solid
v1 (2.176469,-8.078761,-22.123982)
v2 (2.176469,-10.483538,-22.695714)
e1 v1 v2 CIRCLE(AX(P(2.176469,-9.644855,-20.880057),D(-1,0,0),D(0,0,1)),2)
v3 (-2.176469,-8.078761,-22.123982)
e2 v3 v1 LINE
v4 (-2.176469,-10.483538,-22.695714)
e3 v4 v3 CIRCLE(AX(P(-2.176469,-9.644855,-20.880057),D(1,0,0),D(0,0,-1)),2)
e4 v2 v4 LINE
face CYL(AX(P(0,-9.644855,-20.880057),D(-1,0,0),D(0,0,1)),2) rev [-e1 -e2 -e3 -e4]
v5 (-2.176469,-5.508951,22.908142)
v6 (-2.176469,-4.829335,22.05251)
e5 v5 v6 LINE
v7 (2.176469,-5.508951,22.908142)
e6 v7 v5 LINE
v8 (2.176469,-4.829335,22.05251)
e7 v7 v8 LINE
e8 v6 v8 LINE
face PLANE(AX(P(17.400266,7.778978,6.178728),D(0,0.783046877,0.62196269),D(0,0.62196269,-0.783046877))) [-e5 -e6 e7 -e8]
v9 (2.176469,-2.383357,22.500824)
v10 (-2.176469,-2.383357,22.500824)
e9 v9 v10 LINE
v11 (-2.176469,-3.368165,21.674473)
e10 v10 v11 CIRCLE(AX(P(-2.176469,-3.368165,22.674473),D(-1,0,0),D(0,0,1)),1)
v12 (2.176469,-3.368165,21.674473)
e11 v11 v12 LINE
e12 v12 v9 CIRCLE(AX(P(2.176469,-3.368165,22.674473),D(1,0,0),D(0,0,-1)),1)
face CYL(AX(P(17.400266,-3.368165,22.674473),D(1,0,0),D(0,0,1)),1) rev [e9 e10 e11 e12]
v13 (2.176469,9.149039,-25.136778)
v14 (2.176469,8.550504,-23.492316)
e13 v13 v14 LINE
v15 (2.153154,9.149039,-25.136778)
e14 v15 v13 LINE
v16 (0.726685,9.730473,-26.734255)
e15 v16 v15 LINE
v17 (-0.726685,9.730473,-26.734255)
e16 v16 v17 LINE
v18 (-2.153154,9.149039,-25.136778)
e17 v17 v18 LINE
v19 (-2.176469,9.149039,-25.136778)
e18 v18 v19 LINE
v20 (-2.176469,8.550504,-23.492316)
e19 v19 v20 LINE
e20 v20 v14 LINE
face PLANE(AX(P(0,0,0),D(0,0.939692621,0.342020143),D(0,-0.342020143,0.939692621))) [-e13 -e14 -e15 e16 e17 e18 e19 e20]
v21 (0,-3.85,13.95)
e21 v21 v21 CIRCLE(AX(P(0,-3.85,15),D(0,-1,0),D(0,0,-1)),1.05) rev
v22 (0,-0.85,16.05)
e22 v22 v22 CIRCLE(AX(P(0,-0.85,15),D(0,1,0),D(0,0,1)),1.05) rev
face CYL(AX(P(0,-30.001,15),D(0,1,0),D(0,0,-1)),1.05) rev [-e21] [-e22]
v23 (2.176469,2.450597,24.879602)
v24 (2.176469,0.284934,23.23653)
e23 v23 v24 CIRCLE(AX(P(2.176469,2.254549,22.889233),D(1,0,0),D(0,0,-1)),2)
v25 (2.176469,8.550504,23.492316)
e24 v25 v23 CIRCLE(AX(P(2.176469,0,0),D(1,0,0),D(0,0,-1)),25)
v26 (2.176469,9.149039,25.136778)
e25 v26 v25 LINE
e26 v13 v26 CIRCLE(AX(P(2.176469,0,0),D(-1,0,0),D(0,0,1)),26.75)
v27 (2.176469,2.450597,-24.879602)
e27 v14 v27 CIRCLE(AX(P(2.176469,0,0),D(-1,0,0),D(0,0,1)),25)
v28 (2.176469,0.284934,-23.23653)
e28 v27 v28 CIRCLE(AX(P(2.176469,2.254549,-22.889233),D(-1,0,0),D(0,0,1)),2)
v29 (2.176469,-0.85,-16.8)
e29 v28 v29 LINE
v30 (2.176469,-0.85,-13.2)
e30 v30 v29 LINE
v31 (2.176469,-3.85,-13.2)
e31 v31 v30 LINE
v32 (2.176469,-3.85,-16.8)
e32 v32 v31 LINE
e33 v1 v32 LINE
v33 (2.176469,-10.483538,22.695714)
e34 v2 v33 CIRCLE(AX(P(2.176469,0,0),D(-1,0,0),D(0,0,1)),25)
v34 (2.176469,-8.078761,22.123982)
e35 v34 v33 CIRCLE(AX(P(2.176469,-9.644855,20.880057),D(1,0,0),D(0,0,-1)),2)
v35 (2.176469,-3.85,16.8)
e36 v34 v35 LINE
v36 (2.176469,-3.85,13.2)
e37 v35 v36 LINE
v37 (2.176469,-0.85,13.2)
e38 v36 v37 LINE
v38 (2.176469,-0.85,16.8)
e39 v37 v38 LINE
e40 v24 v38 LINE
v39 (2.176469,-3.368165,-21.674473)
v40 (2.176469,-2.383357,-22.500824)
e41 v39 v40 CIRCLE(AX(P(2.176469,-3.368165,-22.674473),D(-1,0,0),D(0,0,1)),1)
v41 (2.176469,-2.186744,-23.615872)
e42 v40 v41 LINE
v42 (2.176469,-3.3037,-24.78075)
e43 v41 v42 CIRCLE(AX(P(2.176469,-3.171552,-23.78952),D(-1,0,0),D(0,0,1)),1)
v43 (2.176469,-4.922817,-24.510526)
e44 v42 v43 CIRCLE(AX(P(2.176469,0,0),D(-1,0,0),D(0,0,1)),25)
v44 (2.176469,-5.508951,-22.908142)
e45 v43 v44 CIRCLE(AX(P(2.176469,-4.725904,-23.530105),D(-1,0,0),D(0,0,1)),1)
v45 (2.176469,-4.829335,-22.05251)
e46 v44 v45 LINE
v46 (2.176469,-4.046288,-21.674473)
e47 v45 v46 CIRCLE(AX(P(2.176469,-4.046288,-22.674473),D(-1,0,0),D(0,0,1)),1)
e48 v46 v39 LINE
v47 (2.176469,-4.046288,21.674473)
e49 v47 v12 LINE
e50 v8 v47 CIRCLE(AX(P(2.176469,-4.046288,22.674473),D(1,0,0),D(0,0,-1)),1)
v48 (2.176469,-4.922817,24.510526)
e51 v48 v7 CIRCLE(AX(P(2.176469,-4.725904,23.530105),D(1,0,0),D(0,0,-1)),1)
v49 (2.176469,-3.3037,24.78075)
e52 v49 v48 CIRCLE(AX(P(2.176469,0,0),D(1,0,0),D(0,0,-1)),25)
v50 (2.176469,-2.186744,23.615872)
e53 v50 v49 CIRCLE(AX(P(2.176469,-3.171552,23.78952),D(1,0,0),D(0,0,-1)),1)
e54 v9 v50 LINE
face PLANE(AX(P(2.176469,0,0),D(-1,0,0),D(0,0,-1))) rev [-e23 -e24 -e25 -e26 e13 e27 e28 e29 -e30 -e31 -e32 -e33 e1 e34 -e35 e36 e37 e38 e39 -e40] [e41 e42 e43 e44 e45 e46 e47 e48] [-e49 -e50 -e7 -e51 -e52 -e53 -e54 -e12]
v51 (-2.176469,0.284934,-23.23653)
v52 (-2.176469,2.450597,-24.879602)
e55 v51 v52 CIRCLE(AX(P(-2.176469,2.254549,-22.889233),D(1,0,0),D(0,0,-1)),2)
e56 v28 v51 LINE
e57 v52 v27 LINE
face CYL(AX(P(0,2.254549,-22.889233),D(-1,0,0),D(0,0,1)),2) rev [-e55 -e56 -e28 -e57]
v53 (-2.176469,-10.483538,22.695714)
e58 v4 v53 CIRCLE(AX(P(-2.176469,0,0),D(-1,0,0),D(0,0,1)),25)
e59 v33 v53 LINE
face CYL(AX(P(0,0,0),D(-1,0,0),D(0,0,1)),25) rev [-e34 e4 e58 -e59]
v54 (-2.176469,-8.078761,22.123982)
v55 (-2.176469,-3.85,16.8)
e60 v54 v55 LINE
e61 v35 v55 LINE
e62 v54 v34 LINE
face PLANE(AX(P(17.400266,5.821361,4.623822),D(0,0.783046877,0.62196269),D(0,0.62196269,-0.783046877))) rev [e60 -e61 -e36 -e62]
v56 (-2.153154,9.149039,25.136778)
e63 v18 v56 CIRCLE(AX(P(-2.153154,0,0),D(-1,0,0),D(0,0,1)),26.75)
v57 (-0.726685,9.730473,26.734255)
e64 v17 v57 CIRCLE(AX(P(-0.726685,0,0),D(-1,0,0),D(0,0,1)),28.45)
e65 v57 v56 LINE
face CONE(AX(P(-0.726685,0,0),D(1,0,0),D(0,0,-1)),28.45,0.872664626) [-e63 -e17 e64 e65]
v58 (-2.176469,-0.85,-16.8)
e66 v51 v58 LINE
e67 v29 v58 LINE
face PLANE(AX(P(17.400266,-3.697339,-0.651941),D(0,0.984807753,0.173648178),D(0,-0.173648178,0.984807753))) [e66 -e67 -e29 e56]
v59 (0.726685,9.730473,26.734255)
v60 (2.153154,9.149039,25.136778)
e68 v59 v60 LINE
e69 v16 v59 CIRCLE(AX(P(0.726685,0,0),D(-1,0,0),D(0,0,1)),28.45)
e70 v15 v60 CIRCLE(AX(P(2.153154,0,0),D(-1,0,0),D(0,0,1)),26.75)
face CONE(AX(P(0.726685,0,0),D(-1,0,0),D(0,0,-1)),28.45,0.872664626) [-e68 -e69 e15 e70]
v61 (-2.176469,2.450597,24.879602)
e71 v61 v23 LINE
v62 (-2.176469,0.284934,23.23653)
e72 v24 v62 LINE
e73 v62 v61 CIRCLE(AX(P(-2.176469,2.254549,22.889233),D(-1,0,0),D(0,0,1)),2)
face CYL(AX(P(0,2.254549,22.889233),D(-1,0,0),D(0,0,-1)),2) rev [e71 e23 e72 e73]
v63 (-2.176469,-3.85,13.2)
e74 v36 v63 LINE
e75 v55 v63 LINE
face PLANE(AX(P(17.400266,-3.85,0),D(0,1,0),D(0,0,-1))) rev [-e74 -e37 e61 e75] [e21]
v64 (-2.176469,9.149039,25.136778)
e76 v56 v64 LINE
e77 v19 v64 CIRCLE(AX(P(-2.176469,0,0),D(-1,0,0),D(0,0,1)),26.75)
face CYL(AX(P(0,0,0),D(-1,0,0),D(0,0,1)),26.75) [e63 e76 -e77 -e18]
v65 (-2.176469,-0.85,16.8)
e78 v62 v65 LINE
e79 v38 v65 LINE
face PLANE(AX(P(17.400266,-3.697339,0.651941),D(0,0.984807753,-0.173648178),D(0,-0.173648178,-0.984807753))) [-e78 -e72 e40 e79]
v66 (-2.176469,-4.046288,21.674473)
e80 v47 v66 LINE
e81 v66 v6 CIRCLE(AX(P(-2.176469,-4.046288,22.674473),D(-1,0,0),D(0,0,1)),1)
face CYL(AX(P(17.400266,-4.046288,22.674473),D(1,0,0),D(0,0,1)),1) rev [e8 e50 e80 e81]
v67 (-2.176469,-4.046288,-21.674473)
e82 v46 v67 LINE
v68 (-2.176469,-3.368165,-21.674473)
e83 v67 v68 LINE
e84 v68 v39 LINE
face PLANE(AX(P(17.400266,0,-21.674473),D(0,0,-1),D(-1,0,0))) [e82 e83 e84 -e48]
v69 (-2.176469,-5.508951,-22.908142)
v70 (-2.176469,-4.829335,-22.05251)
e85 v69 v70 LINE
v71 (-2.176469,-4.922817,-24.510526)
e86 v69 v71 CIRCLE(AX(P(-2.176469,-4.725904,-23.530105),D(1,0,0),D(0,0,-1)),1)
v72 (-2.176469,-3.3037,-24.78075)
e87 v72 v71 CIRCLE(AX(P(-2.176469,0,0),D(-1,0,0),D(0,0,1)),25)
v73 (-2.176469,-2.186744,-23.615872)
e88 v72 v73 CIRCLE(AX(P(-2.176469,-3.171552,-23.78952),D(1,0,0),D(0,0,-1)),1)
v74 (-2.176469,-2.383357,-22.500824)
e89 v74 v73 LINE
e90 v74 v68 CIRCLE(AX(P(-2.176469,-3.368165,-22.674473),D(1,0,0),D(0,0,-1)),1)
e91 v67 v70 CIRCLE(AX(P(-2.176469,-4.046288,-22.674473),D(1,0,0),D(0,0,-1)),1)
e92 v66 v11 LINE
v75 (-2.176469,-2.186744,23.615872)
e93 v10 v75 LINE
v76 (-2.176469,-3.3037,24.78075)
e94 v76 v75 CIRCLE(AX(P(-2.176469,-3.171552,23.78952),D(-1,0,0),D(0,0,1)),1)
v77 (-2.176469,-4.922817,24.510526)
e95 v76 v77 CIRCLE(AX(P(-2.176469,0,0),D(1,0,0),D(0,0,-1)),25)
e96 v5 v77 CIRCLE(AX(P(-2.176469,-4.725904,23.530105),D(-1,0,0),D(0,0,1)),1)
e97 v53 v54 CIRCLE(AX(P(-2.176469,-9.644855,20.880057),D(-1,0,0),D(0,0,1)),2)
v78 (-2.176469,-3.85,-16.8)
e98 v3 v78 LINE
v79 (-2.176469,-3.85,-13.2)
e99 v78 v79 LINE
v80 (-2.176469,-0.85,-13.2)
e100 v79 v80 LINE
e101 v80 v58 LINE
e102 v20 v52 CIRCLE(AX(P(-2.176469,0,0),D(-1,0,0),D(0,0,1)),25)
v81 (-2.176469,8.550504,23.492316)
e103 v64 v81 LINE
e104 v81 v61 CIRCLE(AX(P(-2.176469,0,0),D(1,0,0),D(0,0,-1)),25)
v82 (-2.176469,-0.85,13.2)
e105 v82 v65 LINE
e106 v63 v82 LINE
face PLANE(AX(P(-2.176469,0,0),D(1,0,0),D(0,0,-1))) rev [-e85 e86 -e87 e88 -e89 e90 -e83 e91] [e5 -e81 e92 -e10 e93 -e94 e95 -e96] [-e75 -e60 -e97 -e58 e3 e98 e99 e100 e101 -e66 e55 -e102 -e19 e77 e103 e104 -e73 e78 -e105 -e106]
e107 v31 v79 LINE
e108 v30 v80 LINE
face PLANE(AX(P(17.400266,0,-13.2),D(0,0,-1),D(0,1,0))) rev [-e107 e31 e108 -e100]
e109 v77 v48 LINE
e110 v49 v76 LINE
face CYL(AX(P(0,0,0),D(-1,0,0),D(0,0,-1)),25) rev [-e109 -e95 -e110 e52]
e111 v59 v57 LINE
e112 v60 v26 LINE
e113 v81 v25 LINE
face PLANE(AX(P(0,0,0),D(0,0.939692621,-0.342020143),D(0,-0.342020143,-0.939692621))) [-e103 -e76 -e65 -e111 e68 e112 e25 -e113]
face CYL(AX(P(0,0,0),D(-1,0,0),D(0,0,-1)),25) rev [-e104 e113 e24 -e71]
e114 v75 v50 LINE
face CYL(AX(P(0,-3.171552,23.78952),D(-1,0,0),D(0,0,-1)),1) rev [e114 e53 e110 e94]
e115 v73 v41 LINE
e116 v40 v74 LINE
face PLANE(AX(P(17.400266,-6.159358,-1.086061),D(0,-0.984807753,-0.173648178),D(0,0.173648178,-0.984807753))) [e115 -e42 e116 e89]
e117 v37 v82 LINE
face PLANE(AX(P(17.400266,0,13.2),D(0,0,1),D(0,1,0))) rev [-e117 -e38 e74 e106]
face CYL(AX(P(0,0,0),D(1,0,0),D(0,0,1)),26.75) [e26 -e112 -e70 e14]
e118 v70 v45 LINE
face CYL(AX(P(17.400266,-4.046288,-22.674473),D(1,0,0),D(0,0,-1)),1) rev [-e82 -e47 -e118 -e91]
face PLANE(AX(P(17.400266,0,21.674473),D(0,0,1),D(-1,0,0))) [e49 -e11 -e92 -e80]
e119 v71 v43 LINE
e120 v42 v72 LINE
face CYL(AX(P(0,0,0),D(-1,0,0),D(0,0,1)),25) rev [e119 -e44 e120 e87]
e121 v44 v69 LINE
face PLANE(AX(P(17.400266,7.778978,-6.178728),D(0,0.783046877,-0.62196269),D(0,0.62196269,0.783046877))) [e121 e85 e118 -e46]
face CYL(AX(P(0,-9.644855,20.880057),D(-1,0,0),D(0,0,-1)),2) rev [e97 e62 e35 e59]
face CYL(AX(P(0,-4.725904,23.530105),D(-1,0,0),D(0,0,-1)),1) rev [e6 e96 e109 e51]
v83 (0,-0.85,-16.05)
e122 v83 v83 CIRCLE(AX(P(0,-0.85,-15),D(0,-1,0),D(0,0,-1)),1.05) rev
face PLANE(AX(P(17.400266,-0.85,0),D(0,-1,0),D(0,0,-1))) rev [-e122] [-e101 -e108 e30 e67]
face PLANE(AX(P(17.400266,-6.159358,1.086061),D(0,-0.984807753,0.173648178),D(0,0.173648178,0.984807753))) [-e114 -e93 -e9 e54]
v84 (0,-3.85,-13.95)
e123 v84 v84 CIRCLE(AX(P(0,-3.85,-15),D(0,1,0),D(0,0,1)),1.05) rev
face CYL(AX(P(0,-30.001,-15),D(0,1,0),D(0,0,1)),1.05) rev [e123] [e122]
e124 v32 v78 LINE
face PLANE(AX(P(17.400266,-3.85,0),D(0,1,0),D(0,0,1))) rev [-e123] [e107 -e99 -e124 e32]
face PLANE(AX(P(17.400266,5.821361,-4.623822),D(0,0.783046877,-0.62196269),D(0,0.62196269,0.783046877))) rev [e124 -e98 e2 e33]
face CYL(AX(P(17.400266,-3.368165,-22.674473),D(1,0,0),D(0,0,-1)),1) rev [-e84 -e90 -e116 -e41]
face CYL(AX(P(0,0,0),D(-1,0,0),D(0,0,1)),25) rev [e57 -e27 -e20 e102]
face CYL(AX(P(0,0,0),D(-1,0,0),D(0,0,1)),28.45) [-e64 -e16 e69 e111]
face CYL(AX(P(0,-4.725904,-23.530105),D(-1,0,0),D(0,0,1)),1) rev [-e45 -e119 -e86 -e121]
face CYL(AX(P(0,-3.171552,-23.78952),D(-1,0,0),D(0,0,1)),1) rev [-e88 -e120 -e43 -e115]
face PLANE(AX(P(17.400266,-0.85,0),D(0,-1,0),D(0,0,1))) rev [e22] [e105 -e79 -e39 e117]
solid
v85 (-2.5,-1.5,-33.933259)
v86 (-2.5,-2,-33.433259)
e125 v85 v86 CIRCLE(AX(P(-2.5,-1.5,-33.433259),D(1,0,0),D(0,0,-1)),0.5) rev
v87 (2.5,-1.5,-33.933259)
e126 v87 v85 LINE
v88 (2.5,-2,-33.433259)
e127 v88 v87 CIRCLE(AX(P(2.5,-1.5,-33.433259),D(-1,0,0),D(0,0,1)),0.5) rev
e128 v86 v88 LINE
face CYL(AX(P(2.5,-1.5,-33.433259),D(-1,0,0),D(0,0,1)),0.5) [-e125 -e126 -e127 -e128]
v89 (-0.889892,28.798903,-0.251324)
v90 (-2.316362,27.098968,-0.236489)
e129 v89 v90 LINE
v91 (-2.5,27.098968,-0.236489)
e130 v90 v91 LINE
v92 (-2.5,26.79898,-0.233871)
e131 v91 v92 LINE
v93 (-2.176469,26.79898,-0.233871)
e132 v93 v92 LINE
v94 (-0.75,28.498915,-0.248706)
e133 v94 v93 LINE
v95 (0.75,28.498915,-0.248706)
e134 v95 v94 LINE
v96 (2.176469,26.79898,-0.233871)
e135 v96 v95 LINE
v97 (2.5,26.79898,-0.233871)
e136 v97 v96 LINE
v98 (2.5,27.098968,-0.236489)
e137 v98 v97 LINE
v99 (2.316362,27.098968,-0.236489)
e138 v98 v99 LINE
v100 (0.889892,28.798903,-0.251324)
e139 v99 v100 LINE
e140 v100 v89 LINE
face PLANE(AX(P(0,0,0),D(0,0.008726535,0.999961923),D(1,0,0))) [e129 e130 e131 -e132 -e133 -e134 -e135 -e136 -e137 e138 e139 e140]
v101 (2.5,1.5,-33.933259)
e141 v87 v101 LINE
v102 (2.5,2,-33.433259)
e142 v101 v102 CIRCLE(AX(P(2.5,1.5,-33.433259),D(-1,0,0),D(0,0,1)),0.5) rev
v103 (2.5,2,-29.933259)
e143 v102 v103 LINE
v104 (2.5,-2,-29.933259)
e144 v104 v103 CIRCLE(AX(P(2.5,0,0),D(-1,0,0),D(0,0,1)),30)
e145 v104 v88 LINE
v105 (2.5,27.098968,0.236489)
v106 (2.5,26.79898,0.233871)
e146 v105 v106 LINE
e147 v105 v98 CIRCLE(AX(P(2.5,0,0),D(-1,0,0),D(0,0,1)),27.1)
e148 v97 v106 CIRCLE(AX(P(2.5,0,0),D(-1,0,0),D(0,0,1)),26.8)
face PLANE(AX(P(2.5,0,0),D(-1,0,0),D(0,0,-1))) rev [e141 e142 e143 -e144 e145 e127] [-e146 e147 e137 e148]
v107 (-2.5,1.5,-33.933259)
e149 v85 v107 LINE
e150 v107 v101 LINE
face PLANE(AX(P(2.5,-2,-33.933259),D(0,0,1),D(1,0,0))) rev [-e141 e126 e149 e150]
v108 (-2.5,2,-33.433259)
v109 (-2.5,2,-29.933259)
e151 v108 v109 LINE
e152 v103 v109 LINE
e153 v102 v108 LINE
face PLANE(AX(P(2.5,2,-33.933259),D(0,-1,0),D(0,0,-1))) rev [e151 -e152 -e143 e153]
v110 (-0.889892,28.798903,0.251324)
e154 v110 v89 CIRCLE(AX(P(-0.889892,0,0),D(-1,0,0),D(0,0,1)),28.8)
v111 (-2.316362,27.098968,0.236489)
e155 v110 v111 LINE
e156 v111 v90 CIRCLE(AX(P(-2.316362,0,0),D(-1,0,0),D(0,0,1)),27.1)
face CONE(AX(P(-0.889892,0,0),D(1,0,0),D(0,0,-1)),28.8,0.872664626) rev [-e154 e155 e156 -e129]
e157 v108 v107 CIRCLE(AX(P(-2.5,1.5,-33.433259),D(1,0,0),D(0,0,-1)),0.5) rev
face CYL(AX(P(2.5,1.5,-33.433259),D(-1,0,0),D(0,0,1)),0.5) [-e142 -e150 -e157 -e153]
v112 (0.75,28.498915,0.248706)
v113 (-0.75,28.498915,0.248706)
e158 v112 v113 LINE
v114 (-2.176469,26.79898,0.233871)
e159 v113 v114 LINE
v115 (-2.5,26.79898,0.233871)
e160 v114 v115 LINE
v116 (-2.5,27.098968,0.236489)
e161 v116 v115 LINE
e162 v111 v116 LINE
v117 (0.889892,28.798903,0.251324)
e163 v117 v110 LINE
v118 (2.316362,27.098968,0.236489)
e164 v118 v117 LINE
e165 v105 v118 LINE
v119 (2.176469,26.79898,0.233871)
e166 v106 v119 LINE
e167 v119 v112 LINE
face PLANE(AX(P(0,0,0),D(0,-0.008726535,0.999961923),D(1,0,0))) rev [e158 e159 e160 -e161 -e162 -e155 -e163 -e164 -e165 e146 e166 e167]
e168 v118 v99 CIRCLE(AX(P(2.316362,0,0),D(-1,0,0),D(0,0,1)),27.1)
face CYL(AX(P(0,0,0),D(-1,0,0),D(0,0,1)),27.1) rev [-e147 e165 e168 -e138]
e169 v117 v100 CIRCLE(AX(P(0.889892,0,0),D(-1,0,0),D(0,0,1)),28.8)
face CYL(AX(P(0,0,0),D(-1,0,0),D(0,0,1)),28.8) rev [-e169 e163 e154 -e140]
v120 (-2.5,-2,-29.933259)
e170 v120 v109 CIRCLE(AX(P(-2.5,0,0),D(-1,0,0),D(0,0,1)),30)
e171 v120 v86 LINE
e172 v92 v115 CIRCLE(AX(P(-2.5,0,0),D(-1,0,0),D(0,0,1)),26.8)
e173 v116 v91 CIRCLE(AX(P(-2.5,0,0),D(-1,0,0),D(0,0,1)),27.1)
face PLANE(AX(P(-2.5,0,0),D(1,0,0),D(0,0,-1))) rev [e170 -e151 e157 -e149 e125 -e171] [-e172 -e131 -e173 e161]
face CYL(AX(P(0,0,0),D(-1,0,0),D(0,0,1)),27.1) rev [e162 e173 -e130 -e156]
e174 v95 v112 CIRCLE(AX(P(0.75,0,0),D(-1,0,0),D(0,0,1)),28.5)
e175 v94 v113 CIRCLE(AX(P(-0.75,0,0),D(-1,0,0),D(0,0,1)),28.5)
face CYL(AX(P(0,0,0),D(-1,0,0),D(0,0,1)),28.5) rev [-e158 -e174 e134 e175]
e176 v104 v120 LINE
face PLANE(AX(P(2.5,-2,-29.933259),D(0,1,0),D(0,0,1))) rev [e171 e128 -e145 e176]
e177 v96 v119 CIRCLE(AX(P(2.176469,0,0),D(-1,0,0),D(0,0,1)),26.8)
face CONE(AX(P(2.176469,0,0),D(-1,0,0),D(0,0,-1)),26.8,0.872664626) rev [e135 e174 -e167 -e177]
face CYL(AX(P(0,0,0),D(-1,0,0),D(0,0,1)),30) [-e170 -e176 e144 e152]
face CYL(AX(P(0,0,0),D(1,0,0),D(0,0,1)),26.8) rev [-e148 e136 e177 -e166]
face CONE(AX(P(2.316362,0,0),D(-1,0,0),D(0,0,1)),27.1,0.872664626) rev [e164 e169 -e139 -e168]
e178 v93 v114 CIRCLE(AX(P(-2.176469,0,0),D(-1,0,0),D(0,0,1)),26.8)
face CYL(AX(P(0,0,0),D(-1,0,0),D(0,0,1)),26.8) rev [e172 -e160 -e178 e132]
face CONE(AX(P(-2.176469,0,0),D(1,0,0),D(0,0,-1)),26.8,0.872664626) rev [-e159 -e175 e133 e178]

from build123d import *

# Parameters (mm, degrees)
REVOLVE2_ANGLE      = 110
BOSS_EXTRUDE1_START = -2.176469
BOSS_EXTRUDE1_DEPTH = 4.352938
FILLET1_R           = 2
FILLET2_R           = 1
CUT_EXTRUDE1_REACH  = 44.5
SKETCH4_R           = 1.05
SKETCH5_W           = 4
SKETCH5_H           = 4
BOSS_EXTRUDE2_DEPTH = 2.5
FILLET3_R           = 0.5
CUT_REVOLVE2_ANGLE  = 1


# Read off the part's stored shape, not the designer's step: Revolve2
with BuildPart() as part:
    # Sketch2 → Revolve1 (revolve)
    with BuildSketch(Plane(origin=(0, 0, 0), x_dir=(1, 0, 0), z_dir=(0, 1, 0)), mode=Mode.PRIVATE) as revolve1_sk:
        Polygon((-0.75, 28.5), (0, 28.5), (0, 30), (-2.5, 30), (-2.5, 26.8), (-2.176469373, 26.8), align=None)
    revolve1 = revolve(revolve1_sk.sketch.rotate(Axis((0, 0, 0), (1, 0, 0)), 180), axis=Axis((0, 0, 0), (1, 0, 0)))


with BuildPart() as body_2:
    # Revolve2 outline → Revolve2 (revolve)
    with BuildSketch(Plane(origin=(0, 0, 0), x_dir=(0, -1, 0), z_dir=(0, 0, 1))):
        Polygon((25, 0), (25, -2.176469373), (26.75, -2.176469373), (26.75, -2.15315399), (28.45, -0.726684617), (28.45, 0), align=None)
    revolve2 = revolve(axis=Axis((0, 0, 0), (1, 0, 0)), revolution_arc=REVOLVE2_ANGLE)


with BuildPart() as part_1:
    add(part.part)

    add(body_2.part)  # Mirror1 merges body 2
    # Mirror1: Revolve1, Revolve2 across plane
    add(revolve1.mirror(Plane(origin=(0, 0, 0), x_dir=(0, 0, 1), z_dir=(1, 0, 0))))
    add(revolve2.mirror(Plane(origin=(0, 0, 0), x_dir=(0, 0, 1), z_dir=(1, 0, 0))))

    # Sketch3 → Boss-Extrude1 (add)
    with BuildSketch(Plane(origin=(0, 0, 0), x_dir=(0, 0, -1), z_dir=(1, 0, 0)).offset(BOSS_EXTRUDE1_START)):
        with BuildLine():
            Line((24.992927205, 0.594634117), (16.8, -0.85))
            Line((16.8, -0.85), (13.2, -0.85))
            Line((13.2, -0.85), (13.2, -3.85))
            Line((13.2, -3.85), (16.8, -3.85))
            Line((16.8, -3.85), (23.314414659, -9.024304356))
            ThreePointArc((23.314414659, -9.024304356), (23.762509208, -7.768085746), (24.142970944, -6.489757623))
            Line((24.142970944, -6.489757623), (21.674472629, -4.529065489))
            Line((21.674472629, -4.529065489), (21.674472629, -2.529065489))
            Line((21.674472629, -2.529065489), (24.923348035, -1.956201097))
            ThreePointArc((24.923348035, -1.956201097), (24.990704742, -0.681671824), (24.992927205, 0.594634117))
        make_face()
    extrude(amount=BOSS_EXTRUDE1_DEPTH)

    # Fillet1
    # the kernel refuses this fillet: 2 mm, written as the material it adds along each edge
    with BuildSketch(Plane(origin=(-6.825018134, 0.594634117, -24.992927205), x_dir=(0, 0.9981410168670989, 0.06094678373395691), z_dir=(1, 0, 0))) as fillet1_piece_1_section:
        with BuildLine():
            CenterArc((1.785042868, 1.998616545), FILLET1_R, 186.505841055, 85.625388348)
            Line((-0.202077752, 1.772007538), (0, 0))
            ThreePointArc((0, 0), (0.929709827, -0.017293188), (1.859419654, 0))
        make_face()
    fillet1_piece_1 = extrude(amount=13.650036268, mode=Mode.PRIVATE)
    fillet1_piece_1 = split(fillet1_piece_1, bisect_by=Plane(origin=(-2.176469373, 0.943690029, -24.587007533), z_dir=(1, 0, 0)), keep=Keep.TOP, mode=Mode.PRIVATE)
    fillet1_piece_1 = split(fillet1_piece_1, bisect_by=Plane(origin=(2.176469373, 0.943690029, -24.587007533), z_dir=(-1, 0, 0)), keep=Keep.TOP, mode=Mode.PRIVATE)
    add(fillet1_piece_1)
    with BuildSketch(Plane(origin=(-6.138912646, -9.024304356, -23.314414659), x_dir=(0, -0.9206652582937426, 0.39035302249491577), z_dir=(1, 0, 0))) as fillet1_piece_2_section:
        with BuildLine():
            CenterArc((1.52157836, -1.998994886), FILLET1_R, 88.183445303, 76.333419365)
            Line((-0.405839783, -1.465085435), (0, 0))
            ThreePointArc((0, 0), (0.792488729, 0.012563925), (1.584977458, 0))
        make_face()
    fillet1_piece_2 = extrude(amount=12.277825292, mode=Mode.PRIVATE)
    fillet1_piece_2 = split(fillet1_piece_2, bisect_by=Plane(origin=(-2.176469373, -9.144329866, -22.922792538), z_dir=(1, 0, 0)), keep=Keep.TOP, mode=Mode.PRIVATE)
    fillet1_piece_2 = split(fillet1_piece_2, bisect_by=Plane(origin=(2.176469373, -9.144329866, -22.922792538), z_dir=(-1, 0, 0)), keep=Keep.TOP, mode=Mode.PRIVATE)
    add(fillet1_piece_2)

    # Fillet2
    fillet2_edges = [part_1.edges().sort_by_distance(p)[0] for p in [
        (0, -1.956201097, -24.923348035),
        (0, -2.529065489, -21.674472629),
        (0, -4.529065489, -21.674472629),
        (0, -6.489757623, -24.142970944),
    ]]
    fillet(fillet2_edges, radius=FILLET2_R)

    # Sketch4 → Cut-Extrude1 (cut, up to next)
    with BuildSketch(Plane(origin=(0, 0, 0), x_dir=(1, 0, 0), z_dir=(0, 1, 0)), mode=Mode.PRIVATE) as cut_extrude1_sk1:
        with Locations(Location((0, 15, 0), (0, 0, 270))):
            Circle(SKETCH4_R)
    cut_extrude1_tool1 = extrude(cut_extrude1_sk1.sketch, amount=-CUT_EXTRUDE1_REACH, mode=Mode.PRIVATE) & part_1.part
    add(cut_extrude1_tool1.solids().sort_by_distance((0, 0, -15))[0], mode=Mode.SUBTRACT)

    # Mirror2: part across plane


with BuildPart() as part_2:
    add(part_1.part)
    add(part_1.part.mirror(Plane.XY))

    # Sketch5 → Boss-Extrude2 (add, symmetric)
    with BuildSketch(Plane(origin=(0, 0, 0), x_dir=(0, 0, -1), z_dir=(1, 0, 0))):
        with Locations((31.933259094, 0)):
            Rectangle(SKETCH5_W, SKETCH5_H)
    extrude(amount=BOSS_EXTRUDE2_DEPTH, both=True)

    # Fillet3
    fillet3_edges = [part_2.edges().sort_by_distance(p)[0] for p in [
        (0, 2, -33.933259094),
        (0, -2, -33.933259094),
    ]]
    fillet(fillet3_edges, radius=FILLET3_R)

    # Sketch6 → Cut-Revolve2 (revolve, symmetric, cut)
    with BuildSketch(Plane.XY) as cut_revolve2_sk:
        Polygon((2.5, 27.1), (2.31636167, 27.1), (0.889892297, 28.8), (-0.889892297, 28.8), (-2.31636167, 27.1), (-2.5, 27.1), (-2.5, 26.8), (-2.176469373, 26.8), (-0.75, 28.5), (0.75, 28.5), (2.176469373, 26.8), (2.5, 26.8), align=None)
    revolve(axis=Axis((0, 0, 0), (1, 0, 0)), revolution_arc=CUT_REVOLVE2_ANGLE / 2, mode=Mode.SUBTRACT)
    revolve(cut_revolve2_sk.sketch, axis=Axis((0, 0, 0), (-1, 0, 0)), revolution_arc=CUT_REVOLVE2_ANGLE / 2, mode=Mode.SUBTRACT)


solid = part_2.part
